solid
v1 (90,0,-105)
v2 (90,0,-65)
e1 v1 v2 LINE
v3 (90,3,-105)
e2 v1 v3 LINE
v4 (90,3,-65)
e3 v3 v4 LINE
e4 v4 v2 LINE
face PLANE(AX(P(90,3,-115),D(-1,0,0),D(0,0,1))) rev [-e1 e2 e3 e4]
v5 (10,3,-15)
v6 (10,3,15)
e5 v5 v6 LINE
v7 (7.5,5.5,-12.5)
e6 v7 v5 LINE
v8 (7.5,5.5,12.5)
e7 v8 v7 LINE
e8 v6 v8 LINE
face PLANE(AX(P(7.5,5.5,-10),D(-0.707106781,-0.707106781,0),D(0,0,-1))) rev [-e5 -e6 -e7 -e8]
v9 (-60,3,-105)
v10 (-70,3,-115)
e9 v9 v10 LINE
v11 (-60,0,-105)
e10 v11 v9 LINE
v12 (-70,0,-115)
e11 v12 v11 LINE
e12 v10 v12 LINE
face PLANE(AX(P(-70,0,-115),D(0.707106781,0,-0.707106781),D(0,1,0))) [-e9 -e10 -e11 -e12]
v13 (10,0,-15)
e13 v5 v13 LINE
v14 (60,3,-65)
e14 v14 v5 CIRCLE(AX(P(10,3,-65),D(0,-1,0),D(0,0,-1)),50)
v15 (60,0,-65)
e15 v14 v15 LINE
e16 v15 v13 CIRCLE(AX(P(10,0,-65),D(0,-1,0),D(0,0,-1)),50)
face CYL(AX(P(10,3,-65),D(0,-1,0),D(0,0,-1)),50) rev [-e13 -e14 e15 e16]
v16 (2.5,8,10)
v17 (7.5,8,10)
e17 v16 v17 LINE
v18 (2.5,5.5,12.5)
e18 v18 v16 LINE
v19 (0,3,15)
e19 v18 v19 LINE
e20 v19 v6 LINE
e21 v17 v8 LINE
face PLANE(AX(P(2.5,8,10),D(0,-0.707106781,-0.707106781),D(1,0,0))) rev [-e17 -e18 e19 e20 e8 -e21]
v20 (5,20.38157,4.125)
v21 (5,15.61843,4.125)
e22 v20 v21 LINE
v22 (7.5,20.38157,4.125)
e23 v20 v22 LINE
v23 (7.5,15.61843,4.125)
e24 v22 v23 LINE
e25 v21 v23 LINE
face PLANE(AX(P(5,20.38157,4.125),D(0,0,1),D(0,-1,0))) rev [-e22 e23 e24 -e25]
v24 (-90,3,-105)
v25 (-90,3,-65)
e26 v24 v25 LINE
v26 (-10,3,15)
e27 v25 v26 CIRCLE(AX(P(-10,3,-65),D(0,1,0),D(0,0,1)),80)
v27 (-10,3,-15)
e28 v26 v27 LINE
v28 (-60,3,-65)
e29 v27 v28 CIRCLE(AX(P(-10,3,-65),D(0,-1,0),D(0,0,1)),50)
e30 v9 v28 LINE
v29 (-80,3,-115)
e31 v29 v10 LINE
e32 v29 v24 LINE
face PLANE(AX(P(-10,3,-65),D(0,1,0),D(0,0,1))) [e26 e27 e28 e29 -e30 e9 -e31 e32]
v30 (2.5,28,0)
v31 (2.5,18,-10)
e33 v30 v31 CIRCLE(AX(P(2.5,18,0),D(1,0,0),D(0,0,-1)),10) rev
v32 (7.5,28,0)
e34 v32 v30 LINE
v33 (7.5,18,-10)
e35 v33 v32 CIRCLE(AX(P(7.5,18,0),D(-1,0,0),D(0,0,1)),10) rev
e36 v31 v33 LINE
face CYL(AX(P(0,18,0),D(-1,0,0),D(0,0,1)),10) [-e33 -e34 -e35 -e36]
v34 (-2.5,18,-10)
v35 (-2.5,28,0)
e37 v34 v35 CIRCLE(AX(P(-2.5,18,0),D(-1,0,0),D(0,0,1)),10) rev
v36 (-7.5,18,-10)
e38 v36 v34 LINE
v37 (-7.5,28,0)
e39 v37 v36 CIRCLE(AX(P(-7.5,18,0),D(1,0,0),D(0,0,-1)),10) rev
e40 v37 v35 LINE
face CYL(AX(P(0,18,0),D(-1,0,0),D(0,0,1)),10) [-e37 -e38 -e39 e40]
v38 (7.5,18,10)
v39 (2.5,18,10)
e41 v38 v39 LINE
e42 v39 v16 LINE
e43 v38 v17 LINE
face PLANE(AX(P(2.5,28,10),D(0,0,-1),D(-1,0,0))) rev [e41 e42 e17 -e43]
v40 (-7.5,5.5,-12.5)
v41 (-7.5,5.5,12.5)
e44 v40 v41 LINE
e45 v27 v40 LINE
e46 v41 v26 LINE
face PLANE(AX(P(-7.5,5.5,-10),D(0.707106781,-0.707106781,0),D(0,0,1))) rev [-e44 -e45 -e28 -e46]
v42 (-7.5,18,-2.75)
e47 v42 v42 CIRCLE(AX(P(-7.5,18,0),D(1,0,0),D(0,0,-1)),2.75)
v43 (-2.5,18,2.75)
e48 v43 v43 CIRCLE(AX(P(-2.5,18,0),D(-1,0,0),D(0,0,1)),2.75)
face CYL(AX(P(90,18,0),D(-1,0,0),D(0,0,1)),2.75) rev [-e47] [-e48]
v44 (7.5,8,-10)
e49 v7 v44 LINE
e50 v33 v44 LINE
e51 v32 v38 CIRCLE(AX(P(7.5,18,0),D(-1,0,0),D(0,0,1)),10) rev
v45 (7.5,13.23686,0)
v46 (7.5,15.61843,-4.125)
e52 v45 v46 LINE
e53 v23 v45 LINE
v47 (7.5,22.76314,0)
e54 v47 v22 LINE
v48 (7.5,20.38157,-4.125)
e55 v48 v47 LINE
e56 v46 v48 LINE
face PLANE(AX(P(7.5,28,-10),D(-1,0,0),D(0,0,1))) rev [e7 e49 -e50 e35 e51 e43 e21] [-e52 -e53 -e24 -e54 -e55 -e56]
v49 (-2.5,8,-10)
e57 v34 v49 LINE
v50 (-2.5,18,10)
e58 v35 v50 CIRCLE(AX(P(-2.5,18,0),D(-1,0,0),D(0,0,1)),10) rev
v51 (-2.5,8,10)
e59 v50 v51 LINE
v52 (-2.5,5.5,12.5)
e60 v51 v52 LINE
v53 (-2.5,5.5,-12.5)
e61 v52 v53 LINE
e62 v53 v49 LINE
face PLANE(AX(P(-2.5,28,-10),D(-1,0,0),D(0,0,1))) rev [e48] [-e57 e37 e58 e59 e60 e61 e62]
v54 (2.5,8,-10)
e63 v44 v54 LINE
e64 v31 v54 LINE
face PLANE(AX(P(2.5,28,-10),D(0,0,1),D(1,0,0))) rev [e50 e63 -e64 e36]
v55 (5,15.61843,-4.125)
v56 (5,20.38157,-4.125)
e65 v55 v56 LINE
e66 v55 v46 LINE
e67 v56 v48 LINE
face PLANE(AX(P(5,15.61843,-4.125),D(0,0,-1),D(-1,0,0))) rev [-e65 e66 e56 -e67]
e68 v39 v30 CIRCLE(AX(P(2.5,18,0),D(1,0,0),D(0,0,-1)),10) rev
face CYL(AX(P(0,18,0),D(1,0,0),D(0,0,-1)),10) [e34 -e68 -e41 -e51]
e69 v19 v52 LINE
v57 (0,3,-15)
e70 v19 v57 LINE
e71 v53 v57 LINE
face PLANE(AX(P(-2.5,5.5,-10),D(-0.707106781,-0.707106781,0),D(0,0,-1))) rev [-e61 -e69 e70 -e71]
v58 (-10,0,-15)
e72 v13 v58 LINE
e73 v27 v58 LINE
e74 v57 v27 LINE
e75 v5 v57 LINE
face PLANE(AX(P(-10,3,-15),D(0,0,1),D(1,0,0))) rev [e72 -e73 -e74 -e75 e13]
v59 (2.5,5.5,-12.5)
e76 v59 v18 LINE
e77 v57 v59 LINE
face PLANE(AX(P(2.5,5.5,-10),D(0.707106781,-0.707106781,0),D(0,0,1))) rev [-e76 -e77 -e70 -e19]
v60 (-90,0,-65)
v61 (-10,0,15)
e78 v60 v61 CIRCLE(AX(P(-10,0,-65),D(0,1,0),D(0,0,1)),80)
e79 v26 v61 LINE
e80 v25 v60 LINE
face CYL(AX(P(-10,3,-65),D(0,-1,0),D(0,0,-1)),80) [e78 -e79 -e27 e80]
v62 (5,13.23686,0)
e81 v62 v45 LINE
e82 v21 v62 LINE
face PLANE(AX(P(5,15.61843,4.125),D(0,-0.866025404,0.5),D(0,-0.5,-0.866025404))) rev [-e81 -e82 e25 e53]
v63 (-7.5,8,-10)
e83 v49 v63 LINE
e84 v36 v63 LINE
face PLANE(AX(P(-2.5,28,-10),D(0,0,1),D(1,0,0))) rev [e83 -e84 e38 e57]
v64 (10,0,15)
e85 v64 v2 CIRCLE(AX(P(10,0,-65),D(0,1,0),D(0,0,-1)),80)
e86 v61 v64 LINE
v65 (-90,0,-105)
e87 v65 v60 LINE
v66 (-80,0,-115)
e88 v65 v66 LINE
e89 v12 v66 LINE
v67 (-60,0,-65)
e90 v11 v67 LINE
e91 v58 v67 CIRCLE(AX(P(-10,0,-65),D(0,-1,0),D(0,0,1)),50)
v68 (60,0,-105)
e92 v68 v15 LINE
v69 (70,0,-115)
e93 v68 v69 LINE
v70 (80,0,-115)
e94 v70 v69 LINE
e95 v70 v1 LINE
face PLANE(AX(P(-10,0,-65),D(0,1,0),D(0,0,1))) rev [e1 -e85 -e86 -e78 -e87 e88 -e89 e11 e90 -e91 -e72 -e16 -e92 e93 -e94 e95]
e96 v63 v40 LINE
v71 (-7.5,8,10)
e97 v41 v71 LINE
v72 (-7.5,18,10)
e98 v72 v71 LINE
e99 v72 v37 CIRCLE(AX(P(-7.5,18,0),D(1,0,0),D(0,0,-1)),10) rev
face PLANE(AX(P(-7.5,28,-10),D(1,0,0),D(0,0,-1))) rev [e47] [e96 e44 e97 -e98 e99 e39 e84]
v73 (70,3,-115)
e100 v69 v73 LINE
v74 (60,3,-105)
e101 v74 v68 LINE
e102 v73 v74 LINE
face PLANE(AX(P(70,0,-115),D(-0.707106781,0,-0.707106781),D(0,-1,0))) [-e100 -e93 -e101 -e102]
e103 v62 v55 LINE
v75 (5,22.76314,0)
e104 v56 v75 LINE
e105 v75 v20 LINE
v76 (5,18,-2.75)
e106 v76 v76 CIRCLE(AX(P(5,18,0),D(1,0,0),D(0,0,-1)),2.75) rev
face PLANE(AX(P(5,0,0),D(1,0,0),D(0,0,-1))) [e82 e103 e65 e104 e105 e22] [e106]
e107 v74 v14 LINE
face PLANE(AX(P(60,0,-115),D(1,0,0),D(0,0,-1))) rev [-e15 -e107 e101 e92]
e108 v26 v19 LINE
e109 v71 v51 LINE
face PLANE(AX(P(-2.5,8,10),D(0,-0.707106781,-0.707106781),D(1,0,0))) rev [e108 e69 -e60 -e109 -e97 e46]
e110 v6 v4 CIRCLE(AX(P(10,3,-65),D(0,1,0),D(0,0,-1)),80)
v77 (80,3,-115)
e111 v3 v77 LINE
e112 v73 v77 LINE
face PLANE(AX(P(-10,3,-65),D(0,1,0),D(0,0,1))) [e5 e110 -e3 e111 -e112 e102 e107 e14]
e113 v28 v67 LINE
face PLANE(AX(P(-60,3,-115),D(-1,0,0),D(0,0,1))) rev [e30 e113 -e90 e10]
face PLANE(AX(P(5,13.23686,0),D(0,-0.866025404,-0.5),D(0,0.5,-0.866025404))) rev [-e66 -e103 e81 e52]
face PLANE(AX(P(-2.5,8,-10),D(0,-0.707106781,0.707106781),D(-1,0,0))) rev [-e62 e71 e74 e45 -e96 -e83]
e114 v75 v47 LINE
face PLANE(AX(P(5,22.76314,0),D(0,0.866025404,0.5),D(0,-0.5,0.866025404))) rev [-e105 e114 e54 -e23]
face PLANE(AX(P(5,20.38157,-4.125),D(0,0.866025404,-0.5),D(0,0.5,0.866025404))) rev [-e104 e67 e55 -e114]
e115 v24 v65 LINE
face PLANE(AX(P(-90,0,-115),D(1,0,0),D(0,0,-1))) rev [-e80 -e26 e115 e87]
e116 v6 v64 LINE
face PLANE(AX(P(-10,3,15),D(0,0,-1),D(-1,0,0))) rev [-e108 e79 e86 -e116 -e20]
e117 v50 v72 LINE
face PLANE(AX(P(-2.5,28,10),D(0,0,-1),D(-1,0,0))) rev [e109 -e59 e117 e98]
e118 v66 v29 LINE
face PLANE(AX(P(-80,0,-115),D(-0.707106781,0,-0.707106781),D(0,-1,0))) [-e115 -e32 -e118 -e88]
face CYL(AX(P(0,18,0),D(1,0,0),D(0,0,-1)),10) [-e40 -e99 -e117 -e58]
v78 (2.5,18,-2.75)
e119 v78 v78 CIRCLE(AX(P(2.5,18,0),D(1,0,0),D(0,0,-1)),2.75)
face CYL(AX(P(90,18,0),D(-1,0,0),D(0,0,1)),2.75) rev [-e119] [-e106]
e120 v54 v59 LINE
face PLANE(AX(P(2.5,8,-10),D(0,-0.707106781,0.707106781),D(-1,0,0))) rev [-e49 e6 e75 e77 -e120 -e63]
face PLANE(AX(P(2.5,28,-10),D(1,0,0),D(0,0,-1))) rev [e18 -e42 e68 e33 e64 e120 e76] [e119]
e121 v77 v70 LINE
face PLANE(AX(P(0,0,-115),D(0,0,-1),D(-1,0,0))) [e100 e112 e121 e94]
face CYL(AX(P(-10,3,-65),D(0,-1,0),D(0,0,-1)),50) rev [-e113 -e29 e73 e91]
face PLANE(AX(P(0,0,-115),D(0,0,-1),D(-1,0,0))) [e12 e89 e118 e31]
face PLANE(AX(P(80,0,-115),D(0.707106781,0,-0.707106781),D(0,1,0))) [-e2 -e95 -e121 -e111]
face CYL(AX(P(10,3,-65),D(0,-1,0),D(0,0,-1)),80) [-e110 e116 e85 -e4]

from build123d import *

# Parameters (mm, degrees)
BOSS_EXTRUDE1_DEPTH     = 3
SKETCH4_W               = 5
SKETCH4_H               = 20
BOSS_EXTRUDE2_DEPTH     = 25
FILLET3_R               = 10
CUT_EXTRUDE3_DEPTH      = 121.479251326
CUT_EXTRUDE3_DEPTH_BACK = 121.479251326
SKETCH5_R               = 2.75
CUT_EXTRUDE4_DEPTH      = 2.5
CHAMFER1_SIZE           = 5
CHAMFER3_SIZE           = 2.5
SKETCH7_W               = 30
SKETCH7_H               = 3
BOSS_EXTRUDE3_DEPTH     = 50
CHAMFER4_SIZE           = 10


with BuildPart() as part:
    # Sketch1 → Boss-Extrude1 (new body)
    with BuildSketch(Plane(origin=(0, 0, 0), x_dir=(1, 0, 0), z_dir=(0, 1, 0))):
        with BuildLine():
            Line((-10, 15), (10, 15))
            ThreePointArc((10, 15), (45.355339059, 29.644660941), (60, 65))
            Line((60, 65), (90, 65))
            ThreePointArc((90, 65), (66.568542495, 8.431457505), (10, -15))
            Line((10, -15), (-10, -15))
            ThreePointArc((-10, -15), (-66.568542495, 8.431457505), (-90, 65))
            Line((-90, 65), (-60, 65))
            ThreePointArc((-60, 65), (-45.355339059, 29.644660941), (-10, 15))
        make_face()
    extrude(amount=BOSS_EXTRUDE1_DEPTH)

    # Sketch4 → Boss-Extrude2 (add)
    with BuildSketch(Plane(origin=(0, 3, 0), x_dir=(1, 0, 0), z_dir=(0, 1, 0))):
        with Locations((-5, 0)):
            Rectangle(SKETCH4_W, SKETCH4_H)
        with Locations((5, 0)):
            Rectangle(SKETCH4_W, SKETCH4_H)
    extrude(amount=BOSS_EXTRUDE2_DEPTH)

    # Fillet3
    fillet3_edges = [part.edges().sort_by_distance(p)[0] for p in [
        (5, 28, 10),
        (5, 28, -10),
        (-5, 28, -10),
        (-5, 28, 10),
    ]]
    fillet(fillet3_edges, radius=FILLET3_R - 0.0001)  # a hair under: the kernel refuses the full size

    # Sketch5 → Cut-Extrude3 (cut, two sides: drawn at the far end of the back side and taken through both)
    with BuildSketch(Plane.ZY.offset(7.5).offset(-CUT_EXTRUDE3_DEPTH_BACK)):
        with Locations((0, 18)):
            Circle(SKETCH5_R)
    extrude(amount=CUT_EXTRUDE3_DEPTH + CUT_EXTRUDE3_DEPTH_BACK, mode=Mode.SUBTRACT)

    # Sketch6 → Cut-Extrude4 (cut)
    with BuildSketch(Plane(origin=(7.5, 0, 0), x_dir=(0, 0, -1), z_dir=(1, 0, 0))):
        Polygon((0, 13.236860279), (4.125, 15.61843014), (4.125, 20.38156986), (0, 22.763139721), (-4.125, 20.38156986), (-4.125, 15.61843014), align=None)
    extrude(amount=-CUT_EXTRUDE4_DEPTH, mode=Mode.SUBTRACT)

    # Chamfer1
    chamfer1_edges = [part.edges().sort_by_distance(p)[0] for p in [
        (-5, 3, -10),
        (-5, 3, 10),
        (5, 3, -10),
        (5, 3, 10),
    ]]
    chamfer(chamfer1_edges, length=CHAMFER1_SIZE - 0.0001)  # a hair under: the kernel refuses the full size

    # Chamfer3
    chamfer3_edges = [part.edges().sort_by_distance(p)[0] for p in [
        (-2.5, 3, 0),
        (-7.5, 3, 0),
        (2.5, 3, 0),
        (7.5, 3, 0),
    ]]
    chamfer(chamfer3_edges, length=CHAMFER3_SIZE - 0.0001)  # a hair under: the kernel refuses the full size

    # Sketch7 → Boss-Extrude3 (add)
    with BuildSketch(Plane(origin=(0, 0, -65), x_dir=(-1, 0, 0), z_dir=(0, 0, -1))):
        with Locations((-75, 1.5)):
            Rectangle(SKETCH7_W, SKETCH7_H)
        with Locations((75, 1.5)):
            Rectangle(SKETCH7_W, SKETCH7_H)
    extrude(amount=BOSS_EXTRUDE3_DEPTH)

    # Chamfer4
    chamfer4_edges = [part.edges().sort_by_distance(p)[0] for p in [
        (90, 1.5, -115),
        (60, 1.5, -115),
        (-60, 1.5, -115),
        (-90, 1.5, -115),
    ]]
    chamfer(chamfer4_edges, length=CHAMFER4_SIZE)


solid = part.part
